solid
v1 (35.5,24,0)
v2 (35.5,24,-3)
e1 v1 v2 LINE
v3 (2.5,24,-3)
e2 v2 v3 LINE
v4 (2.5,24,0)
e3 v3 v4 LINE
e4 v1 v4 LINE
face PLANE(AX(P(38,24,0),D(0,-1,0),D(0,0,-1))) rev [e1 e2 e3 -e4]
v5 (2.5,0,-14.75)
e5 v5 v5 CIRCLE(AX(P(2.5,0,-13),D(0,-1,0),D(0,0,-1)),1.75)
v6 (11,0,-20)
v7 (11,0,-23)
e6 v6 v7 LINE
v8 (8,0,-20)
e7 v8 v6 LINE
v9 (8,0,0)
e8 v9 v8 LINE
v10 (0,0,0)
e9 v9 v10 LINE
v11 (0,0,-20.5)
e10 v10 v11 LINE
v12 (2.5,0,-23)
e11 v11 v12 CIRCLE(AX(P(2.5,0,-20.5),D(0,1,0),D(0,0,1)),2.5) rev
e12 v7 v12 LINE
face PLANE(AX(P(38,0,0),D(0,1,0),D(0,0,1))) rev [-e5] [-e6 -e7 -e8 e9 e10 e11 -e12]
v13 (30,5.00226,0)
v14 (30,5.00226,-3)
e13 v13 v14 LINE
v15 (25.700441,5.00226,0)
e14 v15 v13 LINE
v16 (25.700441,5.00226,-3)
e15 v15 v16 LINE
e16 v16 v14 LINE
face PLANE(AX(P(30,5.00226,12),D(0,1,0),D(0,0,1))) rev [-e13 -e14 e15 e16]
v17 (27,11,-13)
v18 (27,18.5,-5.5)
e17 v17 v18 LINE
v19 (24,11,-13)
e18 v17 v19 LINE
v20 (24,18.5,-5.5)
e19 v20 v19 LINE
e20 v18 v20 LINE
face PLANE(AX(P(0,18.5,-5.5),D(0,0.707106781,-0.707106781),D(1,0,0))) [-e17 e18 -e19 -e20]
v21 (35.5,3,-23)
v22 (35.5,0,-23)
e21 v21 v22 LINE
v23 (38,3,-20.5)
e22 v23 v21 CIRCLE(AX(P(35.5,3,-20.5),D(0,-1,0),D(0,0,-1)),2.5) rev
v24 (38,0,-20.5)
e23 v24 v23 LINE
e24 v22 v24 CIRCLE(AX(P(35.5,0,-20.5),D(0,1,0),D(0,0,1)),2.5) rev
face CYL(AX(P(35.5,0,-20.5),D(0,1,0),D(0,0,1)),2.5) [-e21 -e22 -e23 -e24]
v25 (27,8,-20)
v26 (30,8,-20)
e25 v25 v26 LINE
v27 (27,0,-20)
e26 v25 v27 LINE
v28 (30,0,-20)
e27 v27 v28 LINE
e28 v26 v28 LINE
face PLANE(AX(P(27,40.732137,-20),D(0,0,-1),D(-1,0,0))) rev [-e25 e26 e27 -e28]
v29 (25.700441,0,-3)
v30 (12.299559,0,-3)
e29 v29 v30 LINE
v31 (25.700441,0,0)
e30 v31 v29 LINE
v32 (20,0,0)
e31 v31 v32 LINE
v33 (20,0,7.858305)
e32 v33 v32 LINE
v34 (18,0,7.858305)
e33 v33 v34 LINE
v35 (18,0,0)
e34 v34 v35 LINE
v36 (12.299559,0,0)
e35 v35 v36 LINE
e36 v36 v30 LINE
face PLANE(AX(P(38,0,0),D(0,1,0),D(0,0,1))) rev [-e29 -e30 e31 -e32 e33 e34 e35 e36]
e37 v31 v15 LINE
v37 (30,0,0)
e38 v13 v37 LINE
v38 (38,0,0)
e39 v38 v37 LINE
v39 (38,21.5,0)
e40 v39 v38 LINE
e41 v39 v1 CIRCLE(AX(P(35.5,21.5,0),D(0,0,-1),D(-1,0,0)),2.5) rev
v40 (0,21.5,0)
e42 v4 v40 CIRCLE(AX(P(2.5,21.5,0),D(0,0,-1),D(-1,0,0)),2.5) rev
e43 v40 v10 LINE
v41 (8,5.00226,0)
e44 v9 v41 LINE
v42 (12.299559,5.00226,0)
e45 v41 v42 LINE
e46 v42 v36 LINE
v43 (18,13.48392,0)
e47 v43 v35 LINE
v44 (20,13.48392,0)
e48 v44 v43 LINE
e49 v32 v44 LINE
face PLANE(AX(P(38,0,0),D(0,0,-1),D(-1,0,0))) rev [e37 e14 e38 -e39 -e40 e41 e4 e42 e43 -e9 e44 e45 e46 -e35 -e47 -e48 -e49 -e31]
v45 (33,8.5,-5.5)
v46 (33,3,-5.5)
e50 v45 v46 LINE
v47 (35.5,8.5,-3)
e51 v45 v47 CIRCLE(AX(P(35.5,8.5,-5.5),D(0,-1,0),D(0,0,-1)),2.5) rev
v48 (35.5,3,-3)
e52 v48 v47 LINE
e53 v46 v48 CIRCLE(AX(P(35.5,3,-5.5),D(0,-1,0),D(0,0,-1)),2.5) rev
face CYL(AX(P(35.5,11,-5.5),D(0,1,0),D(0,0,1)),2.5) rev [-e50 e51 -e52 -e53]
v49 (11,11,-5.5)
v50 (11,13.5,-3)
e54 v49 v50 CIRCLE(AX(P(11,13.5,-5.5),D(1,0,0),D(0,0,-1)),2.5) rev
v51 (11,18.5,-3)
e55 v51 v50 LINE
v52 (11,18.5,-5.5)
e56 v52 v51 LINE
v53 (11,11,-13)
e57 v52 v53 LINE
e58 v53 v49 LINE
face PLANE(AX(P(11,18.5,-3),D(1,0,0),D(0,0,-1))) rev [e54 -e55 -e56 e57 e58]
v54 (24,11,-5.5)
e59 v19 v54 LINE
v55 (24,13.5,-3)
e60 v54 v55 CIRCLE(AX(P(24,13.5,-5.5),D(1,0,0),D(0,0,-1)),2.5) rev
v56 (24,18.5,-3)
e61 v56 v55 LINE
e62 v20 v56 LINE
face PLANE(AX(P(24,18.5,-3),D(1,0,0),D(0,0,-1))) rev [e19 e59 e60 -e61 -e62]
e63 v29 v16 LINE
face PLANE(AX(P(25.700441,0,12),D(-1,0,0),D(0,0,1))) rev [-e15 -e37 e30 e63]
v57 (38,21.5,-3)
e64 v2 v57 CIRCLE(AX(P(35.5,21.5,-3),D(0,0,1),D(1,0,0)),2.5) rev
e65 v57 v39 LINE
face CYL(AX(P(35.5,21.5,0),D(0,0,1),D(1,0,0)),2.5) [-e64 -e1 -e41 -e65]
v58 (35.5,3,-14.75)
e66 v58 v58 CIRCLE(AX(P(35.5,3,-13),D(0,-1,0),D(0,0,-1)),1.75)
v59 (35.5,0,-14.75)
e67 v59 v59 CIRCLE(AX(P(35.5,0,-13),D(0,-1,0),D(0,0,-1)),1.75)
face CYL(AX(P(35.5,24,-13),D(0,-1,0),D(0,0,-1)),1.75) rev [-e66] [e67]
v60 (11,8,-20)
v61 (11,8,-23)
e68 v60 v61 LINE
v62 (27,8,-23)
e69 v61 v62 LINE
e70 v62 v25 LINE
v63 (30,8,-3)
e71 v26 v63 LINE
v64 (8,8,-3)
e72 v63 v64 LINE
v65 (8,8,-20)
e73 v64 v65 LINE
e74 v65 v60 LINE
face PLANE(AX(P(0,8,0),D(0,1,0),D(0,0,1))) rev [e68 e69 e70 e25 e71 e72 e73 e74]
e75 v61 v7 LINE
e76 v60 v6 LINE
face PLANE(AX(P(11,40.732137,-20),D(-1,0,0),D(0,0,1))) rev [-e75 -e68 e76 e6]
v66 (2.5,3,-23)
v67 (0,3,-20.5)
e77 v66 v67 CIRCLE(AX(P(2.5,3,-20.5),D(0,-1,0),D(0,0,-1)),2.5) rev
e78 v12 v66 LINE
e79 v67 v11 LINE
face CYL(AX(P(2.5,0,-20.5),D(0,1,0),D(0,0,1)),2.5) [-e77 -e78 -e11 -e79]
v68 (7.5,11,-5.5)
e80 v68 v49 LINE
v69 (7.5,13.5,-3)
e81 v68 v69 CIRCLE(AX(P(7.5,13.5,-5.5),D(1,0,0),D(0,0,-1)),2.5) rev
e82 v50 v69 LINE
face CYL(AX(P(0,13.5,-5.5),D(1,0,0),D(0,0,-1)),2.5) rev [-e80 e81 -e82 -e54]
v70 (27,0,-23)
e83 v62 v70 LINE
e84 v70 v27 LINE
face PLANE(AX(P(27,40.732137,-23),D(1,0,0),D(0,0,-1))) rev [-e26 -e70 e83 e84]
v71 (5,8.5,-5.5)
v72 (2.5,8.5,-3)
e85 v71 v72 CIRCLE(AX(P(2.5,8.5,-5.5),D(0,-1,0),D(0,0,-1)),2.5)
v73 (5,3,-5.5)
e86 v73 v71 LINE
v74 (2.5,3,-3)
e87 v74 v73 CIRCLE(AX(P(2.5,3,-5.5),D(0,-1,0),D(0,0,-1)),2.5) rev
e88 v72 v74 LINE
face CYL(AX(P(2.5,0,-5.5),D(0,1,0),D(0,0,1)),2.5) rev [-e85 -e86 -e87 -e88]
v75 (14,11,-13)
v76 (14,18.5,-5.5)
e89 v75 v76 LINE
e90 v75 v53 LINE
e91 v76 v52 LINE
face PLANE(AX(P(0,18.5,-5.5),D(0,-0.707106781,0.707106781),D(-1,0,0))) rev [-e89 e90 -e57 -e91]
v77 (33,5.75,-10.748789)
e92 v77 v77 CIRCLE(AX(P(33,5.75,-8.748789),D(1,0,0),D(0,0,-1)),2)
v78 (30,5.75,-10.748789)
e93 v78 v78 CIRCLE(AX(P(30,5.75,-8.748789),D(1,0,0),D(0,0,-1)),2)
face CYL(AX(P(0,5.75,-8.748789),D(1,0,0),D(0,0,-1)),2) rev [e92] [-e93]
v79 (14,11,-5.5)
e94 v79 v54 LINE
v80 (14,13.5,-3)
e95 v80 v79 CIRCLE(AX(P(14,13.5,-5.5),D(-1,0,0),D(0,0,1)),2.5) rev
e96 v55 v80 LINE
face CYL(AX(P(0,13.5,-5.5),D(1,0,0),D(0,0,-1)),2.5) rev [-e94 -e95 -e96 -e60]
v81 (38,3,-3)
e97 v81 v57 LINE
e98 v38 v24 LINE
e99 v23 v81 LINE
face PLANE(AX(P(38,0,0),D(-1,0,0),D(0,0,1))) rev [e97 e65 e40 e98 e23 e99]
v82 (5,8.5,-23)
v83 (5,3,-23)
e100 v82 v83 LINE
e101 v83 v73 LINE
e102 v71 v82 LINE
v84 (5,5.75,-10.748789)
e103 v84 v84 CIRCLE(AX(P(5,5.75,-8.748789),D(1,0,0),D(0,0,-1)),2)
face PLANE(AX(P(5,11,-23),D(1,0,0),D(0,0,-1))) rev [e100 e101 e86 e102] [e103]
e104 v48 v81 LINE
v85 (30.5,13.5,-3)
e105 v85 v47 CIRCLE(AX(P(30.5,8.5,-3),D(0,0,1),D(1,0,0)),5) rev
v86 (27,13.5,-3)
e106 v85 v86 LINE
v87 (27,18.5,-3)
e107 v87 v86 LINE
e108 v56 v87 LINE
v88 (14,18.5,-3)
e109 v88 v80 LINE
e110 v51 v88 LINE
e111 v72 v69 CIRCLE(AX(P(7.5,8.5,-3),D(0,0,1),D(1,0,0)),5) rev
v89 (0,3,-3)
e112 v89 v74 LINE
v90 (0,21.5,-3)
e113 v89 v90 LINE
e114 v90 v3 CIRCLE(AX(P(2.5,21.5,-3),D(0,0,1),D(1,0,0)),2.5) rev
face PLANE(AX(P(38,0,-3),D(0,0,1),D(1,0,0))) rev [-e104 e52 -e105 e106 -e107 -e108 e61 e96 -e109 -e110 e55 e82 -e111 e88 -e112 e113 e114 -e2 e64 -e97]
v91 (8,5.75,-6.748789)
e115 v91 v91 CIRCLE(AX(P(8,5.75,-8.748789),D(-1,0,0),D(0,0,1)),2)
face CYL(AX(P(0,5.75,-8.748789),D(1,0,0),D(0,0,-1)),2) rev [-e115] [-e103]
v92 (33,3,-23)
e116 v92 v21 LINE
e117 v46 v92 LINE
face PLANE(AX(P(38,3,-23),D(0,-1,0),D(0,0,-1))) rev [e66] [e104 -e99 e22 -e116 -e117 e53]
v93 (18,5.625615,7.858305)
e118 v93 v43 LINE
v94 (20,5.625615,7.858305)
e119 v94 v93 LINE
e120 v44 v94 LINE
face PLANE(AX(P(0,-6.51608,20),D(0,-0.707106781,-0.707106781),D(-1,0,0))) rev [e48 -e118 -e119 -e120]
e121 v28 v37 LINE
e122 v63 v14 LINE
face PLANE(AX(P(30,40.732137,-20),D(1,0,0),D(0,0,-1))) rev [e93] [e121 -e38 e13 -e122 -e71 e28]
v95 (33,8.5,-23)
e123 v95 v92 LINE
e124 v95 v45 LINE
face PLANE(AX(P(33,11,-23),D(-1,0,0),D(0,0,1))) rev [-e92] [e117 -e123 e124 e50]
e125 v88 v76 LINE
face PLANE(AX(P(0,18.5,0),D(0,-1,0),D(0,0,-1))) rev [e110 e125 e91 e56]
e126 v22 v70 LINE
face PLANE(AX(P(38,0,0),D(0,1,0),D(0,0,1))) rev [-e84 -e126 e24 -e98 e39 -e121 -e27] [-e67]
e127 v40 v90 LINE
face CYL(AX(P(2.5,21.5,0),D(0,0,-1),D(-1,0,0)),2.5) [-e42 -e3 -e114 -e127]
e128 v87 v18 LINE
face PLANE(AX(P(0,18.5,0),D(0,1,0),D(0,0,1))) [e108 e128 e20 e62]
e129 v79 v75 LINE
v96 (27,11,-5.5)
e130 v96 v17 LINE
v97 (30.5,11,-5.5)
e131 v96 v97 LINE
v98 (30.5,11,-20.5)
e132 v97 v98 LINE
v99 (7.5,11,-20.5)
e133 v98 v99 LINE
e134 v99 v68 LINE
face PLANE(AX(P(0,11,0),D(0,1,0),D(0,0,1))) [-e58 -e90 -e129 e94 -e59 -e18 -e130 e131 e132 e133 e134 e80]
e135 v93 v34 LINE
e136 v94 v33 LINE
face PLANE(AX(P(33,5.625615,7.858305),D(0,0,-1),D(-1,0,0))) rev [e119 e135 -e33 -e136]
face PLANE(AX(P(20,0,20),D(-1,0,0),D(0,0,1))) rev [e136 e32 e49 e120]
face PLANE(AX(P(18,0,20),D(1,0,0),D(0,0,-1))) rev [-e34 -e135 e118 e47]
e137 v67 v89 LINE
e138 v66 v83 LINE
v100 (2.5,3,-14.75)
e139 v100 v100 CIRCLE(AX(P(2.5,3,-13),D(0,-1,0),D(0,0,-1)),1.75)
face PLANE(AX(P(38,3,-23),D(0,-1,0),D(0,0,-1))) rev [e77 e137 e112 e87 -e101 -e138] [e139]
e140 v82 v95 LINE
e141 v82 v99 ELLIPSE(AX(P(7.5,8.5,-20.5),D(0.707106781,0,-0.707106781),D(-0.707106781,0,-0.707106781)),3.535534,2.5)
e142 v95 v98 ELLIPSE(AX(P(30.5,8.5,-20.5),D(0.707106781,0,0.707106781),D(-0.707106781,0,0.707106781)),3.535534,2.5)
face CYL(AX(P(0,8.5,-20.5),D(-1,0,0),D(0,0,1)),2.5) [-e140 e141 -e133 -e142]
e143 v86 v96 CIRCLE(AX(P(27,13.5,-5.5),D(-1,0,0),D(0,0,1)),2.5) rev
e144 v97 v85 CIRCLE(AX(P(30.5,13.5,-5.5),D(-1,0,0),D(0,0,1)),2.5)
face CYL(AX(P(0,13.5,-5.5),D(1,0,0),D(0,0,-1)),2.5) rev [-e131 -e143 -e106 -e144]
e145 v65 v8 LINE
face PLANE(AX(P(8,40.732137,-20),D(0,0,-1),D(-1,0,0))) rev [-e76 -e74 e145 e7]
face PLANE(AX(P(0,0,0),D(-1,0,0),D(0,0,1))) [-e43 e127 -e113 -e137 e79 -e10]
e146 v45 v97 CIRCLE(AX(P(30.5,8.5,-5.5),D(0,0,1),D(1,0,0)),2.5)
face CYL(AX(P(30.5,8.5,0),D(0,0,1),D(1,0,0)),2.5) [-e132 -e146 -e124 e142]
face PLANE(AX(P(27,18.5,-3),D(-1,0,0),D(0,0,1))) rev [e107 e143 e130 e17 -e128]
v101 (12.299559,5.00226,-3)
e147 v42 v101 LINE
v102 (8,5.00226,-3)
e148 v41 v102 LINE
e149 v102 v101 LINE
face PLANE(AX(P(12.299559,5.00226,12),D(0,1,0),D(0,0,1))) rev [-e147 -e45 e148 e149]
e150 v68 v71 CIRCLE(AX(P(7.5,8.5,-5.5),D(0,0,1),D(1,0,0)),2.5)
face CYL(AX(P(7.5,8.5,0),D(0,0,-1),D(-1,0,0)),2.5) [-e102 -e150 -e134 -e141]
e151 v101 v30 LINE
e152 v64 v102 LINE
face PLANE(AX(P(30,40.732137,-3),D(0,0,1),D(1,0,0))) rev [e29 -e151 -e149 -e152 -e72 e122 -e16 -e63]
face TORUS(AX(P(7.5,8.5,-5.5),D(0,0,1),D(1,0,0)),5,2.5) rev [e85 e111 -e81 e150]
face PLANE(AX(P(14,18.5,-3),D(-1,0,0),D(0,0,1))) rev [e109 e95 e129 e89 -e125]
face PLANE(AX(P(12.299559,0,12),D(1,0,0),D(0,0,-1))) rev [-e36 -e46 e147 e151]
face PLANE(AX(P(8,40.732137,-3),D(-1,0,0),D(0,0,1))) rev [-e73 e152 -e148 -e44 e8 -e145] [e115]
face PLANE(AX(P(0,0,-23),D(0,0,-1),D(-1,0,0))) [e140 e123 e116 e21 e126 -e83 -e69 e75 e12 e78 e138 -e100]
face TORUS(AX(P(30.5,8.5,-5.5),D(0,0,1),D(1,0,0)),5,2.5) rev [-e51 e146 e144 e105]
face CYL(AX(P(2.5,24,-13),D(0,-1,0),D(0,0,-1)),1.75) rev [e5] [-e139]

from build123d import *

# Parameters (mm, degrees)
SKETCH1_W           = 3
SKETCH1_H           = 24
BOSS_EXTRUDE1_DEPTH = 38
SKETCH2_W           = 2
SKETCH2_H           = 13.483919992
BOSS_EXTRUDE2_DEPTH = 20
CHAMFER1_SIZE       = 20
SKETCH3_W           = 38
SKETCH3_H           = 3
BOSS_EXTRUDE3_DEPTH = 20
SKETCH4_R           = 1.75
CUT_EXTRUDE1_DEPTH  = 51.487622245
SKETCH5_W           = 28
SKETCH5_H           = 20
BOSS_EXTRUDE4_DEPTH = 8
CUT_EXTRUDE2_DEPTH  = 8
SKETCH7_W           = 4.299558672
SKETCH7_H           = 5.002260433
CUT_EXTRUDE3_DEPTH  = 15
CUT_EXTRUDE4_DEPTH  = 15
FILLET3_R           = 2.5
SKETCH9_W           = 3
SKETCH9_H           = 10
BOSS_EXTRUDE5_DEPTH = 7.5
CHAMFER2_SIZE       = 7.5
FILLET4_R           = 2.5
SKETCH11_R          = 2
CUT_EXTRUDE5_DEPTH  = 47.840153715


# Some blends are built 0.0001 mm under size
with BuildPart() as part:
    # Sketch1 → Boss-Extrude1 (new body)
    with BuildSketch(Plane(origin=(0, 0, 0), x_dir=(0, 0, -1), z_dir=(1, 0, 0))):
        with Locations((1.5, 12)):
            Rectangle(SKETCH1_W, SKETCH1_H)
    extrude(amount=BOSS_EXTRUDE1_DEPTH)

    # Sketch2 → Boss-Extrude2 (add)
    with BuildSketch(Plane.XY):
        with Locations((19, 6.741959996)):
            Rectangle(SKETCH2_W, SKETCH2_H)
    extrude(amount=BOSS_EXTRUDE2_DEPTH)

    # Chamfer1
    # the kernel refuses this chamfer: 20 mm, written as the material it takes off along each edge
    with BuildSketch(Plane(origin=(71.433659759, 13.483919992, 20), x_dir=(0, 0.027495876610586403, -0.9996219169112968), z_dir=(-1, 0, 0))) as chamfer1_piece_1_section:
        Polygon((CHAMFER1_SIZE * 0.999621916911, CHAMFER1_SIZE * 0.0274958766106), (-CHAMFER1_SIZE * 0.0274958766106, CHAMFER1_SIZE * 0.999621916911), (0, 0), align=None)
    chamfer1_piece_1 = extrude(amount=104.867319519, mode=Mode.PRIVATE)
    chamfer1_piece_1 = split(chamfer1_piece_1, bisect_by=Plane(origin=(19, 6.875836906, 0), z_dir=(0, 0, 1)), keep=Keep.TOP, mode=Mode.PRIVATE)
    add(chamfer1_piece_1, mode=Mode.SUBTRACT)

    # Sketch3 → Boss-Extrude3 (add)
    with BuildSketch(Plane(origin=(0, 0, -3), x_dir=(-1, 0, 0), z_dir=(0, 0, -1))):
        with Locations((-19, 1.5)):
            Rectangle(SKETCH3_W, SKETCH3_H)
    extrude(amount=BOSS_EXTRUDE3_DEPTH)

    # Sketch4 → Cut-Extrude1 (cut, through all)
    with BuildSketch(Plane.XZ):
        with Locations(Location((2.5, -13, 0), (0, 0, 270))):
            Circle(SKETCH4_R)
        with Locations(Location((35.5, -13, 0), (0, 0, 270))):
            Circle(SKETCH4_R)
    extrude(amount=-CUT_EXTRUDE1_DEPTH, mode=Mode.SUBTRACT)

    # Sketch5 → Boss-Extrude4 (add)
    with BuildSketch(Plane(origin=(0, 3, 0), x_dir=(1, 0, 0), z_dir=(0, 1, 0))):
        with Locations((19, 13)):
            Rectangle(SKETCH5_W, SKETCH5_H)
    extrude(amount=BOSS_EXTRUDE4_DEPTH)

    # Sketch6 → Cut-Extrude2 (cut)
    with BuildSketch(Plane.XZ):
        Polygon((11, -23), (27, -23), (27, -20), (30, -20), (30, -3), (8, -3), (8, -20), (11, -20), align=None)
    extrude(amount=-CUT_EXTRUDE2_DEPTH, mode=Mode.SUBTRACT)

    # Sketch7 → Cut-Extrude3 (cut)
    with BuildSketch(Plane(origin=(0, 0, -3), x_dir=(-1, 0, 0), z_dir=(0, 0, -1))):
        with Locations((-27.850220664, 2.501130217)):
            Rectangle(SKETCH7_W, SKETCH7_H)
        with Locations((-10.149779336, 2.501130217)):
            Rectangle(SKETCH7_W, SKETCH7_H)
    extrude(amount=-CUT_EXTRUDE3_DEPTH, mode=Mode.SUBTRACT)

    # Sketch8 → Cut-Extrude4 (cut)
    with BuildSketch(Plane.ZY.offset(-18)):
        Polygon((7.858304832, 5.62561516), (7.858304832, 0), (13.483919992, 0), align=None)
    extrude(amount=-CUT_EXTRUDE4_DEPTH, mode=Mode.SUBTRACT)

    # Fillet3
    fillet3_edges = [part.edges().sort_by_distance(p)[0] for p in [
        (38, 1.5, -23),
        (0, 1.5, -23),
        (5, 7, -3),
        (33, 7, -3),
        (5, 11, -13),
        (19, 11, -3),
        (33, 11, -13),
        (19, 11, -23),
    ]]
    fillet(fillet3_edges, radius=FILLET3_R)

    # Sketch9 → Boss-Extrude5 (add)
    with BuildSketch(Plane(origin=(0, 11, 0), x_dir=(1, 0, 0), z_dir=(0, 1, 0))):
        with Locations((12.5, 8)):
            Rectangle(SKETCH9_W, SKETCH9_H)
        with Locations((25.5, 8)):
            Rectangle(SKETCH9_W, SKETCH9_H)
    extrude(amount=BOSS_EXTRUDE5_DEPTH)

    # Chamfer2
    chamfer2_edges = [part.edges().sort_by_distance(p)[0] for p in [
        (12.5, 18.5, -13),
        (25.5, 18.5, -13),
    ]]
    chamfer(chamfer2_edges, length=CHAMFER2_SIZE - 0.0001)  # a hair under: the kernel refuses the full size

    # Fillet4
    fillet4_edges = [part.edges().sort_by_distance(p)[0] for p in [
        (38, 24, -1.5),
        (0, 24, -1.5),
    ]]
    fillet(fillet4_edges, radius=FILLET4_R)

    # Sketch11 → Cut-Extrude5 (cut, through all)
    with BuildSketch(Plane(origin=(33, 0, 0), x_dir=(0, 0, -1), z_dir=(1, 0, 0))):
        with Locations((8.74878855, 5.75)):
            Circle(SKETCH11_R)
    extrude(amount=-CUT_EXTRUDE5_DEPTH, mode=Mode.SUBTRACT)


solid = part.part
